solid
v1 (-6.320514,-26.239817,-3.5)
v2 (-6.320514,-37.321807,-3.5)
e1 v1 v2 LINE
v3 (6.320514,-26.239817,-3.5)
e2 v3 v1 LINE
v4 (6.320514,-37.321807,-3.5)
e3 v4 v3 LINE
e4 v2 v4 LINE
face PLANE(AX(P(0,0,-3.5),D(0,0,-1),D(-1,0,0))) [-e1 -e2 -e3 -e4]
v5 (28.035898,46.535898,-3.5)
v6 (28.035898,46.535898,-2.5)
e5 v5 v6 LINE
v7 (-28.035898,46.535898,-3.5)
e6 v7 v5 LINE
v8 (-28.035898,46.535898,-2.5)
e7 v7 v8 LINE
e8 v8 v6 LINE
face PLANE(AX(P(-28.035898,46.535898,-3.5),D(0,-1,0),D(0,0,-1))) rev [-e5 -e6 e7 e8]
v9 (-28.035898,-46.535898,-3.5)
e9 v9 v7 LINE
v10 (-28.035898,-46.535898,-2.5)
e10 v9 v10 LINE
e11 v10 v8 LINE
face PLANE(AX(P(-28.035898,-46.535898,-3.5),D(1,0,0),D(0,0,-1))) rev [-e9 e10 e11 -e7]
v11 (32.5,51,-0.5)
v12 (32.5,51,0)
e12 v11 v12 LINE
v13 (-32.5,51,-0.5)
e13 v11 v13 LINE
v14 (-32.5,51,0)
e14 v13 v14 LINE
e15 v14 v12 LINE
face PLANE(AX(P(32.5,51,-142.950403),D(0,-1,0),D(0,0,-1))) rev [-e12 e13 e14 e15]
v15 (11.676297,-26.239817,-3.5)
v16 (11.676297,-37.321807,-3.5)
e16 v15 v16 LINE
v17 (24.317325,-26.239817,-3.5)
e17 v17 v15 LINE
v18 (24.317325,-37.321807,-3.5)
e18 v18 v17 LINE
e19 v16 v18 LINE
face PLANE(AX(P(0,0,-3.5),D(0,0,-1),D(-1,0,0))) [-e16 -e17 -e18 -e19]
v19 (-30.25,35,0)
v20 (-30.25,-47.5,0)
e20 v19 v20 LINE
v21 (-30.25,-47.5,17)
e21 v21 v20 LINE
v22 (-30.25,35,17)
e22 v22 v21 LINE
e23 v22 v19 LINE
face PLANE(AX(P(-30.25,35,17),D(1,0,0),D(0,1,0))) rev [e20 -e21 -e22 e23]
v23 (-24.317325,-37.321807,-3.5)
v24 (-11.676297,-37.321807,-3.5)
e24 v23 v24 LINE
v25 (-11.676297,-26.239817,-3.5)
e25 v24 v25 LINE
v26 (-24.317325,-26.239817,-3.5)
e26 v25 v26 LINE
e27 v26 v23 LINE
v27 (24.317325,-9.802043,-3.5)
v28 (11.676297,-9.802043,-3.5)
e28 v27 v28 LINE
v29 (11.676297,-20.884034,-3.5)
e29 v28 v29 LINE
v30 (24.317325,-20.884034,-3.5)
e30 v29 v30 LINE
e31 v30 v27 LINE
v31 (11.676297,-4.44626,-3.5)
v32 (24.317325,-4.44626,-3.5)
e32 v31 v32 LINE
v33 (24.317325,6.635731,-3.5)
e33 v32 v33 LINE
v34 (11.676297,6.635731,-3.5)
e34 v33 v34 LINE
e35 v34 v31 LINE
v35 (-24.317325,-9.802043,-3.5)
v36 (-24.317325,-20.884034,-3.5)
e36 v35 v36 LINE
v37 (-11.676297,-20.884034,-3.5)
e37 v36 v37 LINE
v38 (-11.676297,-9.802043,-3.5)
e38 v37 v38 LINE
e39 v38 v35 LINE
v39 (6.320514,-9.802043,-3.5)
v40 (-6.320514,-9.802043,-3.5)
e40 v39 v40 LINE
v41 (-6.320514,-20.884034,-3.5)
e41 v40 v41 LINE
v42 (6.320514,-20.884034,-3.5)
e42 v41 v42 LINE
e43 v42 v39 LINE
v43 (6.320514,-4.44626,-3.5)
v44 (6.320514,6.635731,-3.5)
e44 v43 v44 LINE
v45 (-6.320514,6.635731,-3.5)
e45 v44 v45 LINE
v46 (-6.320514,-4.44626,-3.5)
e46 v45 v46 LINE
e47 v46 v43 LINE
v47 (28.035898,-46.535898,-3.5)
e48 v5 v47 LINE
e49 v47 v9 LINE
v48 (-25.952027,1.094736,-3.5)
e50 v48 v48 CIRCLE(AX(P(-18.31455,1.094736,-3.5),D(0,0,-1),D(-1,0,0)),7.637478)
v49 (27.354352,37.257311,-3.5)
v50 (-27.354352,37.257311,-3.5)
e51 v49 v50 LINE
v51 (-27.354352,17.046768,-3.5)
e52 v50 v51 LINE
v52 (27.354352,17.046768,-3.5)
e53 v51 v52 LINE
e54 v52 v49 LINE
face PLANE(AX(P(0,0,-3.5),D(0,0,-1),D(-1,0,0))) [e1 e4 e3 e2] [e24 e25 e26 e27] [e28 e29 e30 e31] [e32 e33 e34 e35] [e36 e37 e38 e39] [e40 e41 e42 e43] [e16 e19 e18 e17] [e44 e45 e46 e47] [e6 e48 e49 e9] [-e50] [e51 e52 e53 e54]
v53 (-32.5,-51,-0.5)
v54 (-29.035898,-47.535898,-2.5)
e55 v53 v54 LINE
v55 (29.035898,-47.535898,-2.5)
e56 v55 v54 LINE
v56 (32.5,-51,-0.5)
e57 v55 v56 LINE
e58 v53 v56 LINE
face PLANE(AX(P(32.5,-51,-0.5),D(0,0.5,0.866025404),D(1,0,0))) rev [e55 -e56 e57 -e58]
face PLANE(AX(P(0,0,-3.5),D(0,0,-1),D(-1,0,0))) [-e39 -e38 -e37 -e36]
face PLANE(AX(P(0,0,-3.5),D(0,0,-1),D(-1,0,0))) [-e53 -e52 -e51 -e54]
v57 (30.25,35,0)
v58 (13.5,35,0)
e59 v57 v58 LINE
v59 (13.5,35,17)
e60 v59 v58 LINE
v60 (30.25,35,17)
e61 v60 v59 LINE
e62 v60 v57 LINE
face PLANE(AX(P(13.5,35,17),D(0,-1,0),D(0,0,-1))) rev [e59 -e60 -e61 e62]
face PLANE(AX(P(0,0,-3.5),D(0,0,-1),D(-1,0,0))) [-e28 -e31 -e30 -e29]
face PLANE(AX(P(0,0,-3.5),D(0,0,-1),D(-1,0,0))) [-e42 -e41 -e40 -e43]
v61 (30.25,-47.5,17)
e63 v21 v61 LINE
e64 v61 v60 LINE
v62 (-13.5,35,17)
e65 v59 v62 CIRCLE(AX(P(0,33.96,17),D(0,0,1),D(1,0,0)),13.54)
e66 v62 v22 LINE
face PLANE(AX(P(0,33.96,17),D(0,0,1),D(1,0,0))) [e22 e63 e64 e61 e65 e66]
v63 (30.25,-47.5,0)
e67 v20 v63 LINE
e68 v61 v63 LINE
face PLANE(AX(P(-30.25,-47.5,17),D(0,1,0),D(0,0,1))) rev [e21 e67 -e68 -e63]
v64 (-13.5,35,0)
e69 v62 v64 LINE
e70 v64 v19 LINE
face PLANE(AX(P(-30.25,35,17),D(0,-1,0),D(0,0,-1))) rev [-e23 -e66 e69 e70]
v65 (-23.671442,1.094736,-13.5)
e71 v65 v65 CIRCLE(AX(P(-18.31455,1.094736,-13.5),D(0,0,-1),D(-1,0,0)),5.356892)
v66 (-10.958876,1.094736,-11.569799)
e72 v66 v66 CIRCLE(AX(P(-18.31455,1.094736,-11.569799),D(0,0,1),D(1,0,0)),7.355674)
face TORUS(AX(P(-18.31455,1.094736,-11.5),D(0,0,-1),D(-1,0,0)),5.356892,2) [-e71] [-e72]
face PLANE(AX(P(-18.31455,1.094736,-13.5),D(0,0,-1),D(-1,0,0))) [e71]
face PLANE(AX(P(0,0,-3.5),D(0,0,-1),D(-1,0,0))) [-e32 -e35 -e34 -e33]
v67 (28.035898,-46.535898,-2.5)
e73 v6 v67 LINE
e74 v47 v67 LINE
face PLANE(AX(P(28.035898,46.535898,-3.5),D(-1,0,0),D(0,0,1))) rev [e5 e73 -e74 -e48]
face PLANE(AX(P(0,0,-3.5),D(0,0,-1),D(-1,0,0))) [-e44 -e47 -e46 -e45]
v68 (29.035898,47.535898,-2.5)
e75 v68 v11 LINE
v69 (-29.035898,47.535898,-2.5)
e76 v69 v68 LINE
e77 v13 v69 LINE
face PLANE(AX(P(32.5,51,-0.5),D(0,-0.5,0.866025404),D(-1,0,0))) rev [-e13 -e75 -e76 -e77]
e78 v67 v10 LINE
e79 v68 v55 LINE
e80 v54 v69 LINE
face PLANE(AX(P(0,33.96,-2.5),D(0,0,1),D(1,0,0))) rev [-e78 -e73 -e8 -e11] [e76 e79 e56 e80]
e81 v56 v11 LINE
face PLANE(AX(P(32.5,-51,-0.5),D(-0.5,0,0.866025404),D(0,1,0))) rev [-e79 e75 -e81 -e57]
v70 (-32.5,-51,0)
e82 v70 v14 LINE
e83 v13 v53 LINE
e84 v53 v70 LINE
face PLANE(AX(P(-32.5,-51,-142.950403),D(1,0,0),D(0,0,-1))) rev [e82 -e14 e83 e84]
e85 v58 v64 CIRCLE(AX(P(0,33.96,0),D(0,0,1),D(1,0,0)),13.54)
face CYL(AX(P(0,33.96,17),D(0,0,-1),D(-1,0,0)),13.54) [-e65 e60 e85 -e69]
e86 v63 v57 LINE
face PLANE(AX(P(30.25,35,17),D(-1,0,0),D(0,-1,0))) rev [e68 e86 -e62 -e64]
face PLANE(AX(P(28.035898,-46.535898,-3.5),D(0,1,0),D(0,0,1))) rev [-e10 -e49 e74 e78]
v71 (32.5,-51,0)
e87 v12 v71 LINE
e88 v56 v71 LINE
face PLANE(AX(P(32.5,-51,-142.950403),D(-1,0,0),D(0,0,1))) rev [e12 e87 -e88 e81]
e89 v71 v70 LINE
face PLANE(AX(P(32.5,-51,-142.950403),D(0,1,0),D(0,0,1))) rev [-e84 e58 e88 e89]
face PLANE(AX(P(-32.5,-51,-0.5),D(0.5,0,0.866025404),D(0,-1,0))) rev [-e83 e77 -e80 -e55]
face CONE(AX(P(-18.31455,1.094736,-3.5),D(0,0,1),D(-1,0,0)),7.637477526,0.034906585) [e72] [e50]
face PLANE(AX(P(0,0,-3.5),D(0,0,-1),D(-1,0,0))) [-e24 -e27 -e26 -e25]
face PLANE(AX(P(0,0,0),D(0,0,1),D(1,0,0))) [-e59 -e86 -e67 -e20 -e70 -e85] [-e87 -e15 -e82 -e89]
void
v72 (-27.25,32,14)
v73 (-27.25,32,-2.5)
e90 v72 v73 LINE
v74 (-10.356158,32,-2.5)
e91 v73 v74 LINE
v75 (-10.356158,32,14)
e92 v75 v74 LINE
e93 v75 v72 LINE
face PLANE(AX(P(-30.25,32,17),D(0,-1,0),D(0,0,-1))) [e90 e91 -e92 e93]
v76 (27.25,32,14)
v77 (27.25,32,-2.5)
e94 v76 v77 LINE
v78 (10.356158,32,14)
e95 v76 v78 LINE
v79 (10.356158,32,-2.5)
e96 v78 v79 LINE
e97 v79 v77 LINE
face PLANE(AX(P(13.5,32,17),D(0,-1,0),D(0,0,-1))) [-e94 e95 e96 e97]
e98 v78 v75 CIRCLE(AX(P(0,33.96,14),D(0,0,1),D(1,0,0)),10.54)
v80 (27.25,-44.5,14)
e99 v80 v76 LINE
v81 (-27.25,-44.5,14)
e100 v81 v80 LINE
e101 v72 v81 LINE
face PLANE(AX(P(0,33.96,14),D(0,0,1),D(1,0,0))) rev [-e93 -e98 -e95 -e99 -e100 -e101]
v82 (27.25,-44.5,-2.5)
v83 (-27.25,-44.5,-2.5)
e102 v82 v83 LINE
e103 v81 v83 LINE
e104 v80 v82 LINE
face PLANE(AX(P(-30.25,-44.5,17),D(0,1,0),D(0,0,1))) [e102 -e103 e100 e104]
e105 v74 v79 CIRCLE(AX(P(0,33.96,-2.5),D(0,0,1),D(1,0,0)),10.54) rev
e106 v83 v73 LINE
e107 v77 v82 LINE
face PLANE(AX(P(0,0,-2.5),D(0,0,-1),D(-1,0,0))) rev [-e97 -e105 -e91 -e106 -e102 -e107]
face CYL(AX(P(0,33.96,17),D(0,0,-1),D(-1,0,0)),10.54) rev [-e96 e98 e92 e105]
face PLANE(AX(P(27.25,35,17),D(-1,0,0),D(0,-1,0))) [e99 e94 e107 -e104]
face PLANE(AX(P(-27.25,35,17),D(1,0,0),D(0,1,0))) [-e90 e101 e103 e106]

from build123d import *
from OCP.BRepFilletAPI import BRepFilletAPI_MakeChamfer

# Parameters (mm, degrees)
BOSS_EXTRUDE1_DEPTH = 17
SKETCH2_W           = 65
SKETCH2_H           = 102
BOSS_EXTRUDE2_DEPTH = 2.5
SHELL1_START        = -2.5
SHELL1_DEPTH        = 16.5
CHAMFER1_SIZE       = 2
CHAMFER1_SIZE2      = 3.464101615
SKETCH3_W           = 56.07179677
SKETCH3_H           = 93.07179677
BOSS_EXTRUDE3_DEPTH = 1
SKETCH5_R           = 7.637477526
BOSS_EXTRUDE4_DEPTH = 10
BOSS_EXTRUDE4_TAPER = 2
FILLET1_R           = 2


# Read off the part's stored shape, not the designer's step: Shell1
with BuildPart() as part:
    # Sketch1 → Boss-Extrude1 (new body)
    with BuildSketch(Plane.XY):
        with BuildLine():
            Line((13.5, 35), (30.25, 35))
            Line((30.25, 35), (30.25, -47.5))
            Line((30.25, -47.5), (-30.25, -47.5))
            Line((-30.25, -47.5), (-30.25, 35))
            Line((-30.25, 35), (-13.5, 35))
            ThreePointArc((-13.5, 35), (0, 47.5), (13.5, 35))
        make_face()
    extrude(amount=BOSS_EXTRUDE1_DEPTH)

    # Sketch2 → Boss-Extrude2 (add)
    with BuildSketch(Plane(origin=(0, 0, 0), x_dir=(-1, 0, 0), z_dir=(0, 0, -1))):
        Rectangle(SKETCH2_W, SKETCH2_H)
    extrude(amount=BOSS_EXTRUDE2_DEPTH)

    # Shell1 outline → Shell1 (cut)
    with BuildSketch(Plane.XY.offset(SHELL1_START)):
        with BuildLine():
            Line((27.25, -44.5), (27.25, 32))
            Line((27.25, 32), (10.356157589, 32))
            ThreePointArc((10.356157589, 32), (0, 44.5), (-10.356157589, 32))
            Line((-10.356157589, 32), (-27.25, 32))
            Line((-27.25, 32), (-27.25, -44.5))
            Line((-27.25, -44.5), (27.25, -44.5))
        make_face()
    extrude(amount=SHELL1_DEPTH, mode=Mode.SUBTRACT)

    # Chamfer1: one chamfer whose edges measure the first distance from different faces: ONE call of the kernel's chamfer builder (chamfer() names one face for all edges)
    chamfer1_edges_1 = [part.edges().sort_by_distance(p)[0] for p in [
        (0, -51, -2.5),
    ]]
    chamfer1_side_1 = [part.faces().sort_by_distance(p)[0] for p in [
        (0, -51, -1.25),
    ]]
    chamfer1_edges_2 = [part.edges().sort_by_distance(p)[0] for p in [
        (32.5, 0, -2.5),
    ]]
    chamfer1_side_2 = [part.faces().sort_by_distance(p)[0] for p in [
        (32.5, 0, -1.25),
    ]]
    chamfer1_edges_3 = [part.edges().sort_by_distance(p)[0] for p in [
        (0, 51, -2.5),
    ]]
    chamfer1_side_3 = [part.faces().sort_by_distance(p)[0] for p in [
        (0, 51, -1.25),
    ]]
    chamfer1_edges_4 = [part.edges().sort_by_distance(p)[0] for p in [
        (-32.5, 0, -2.5),
    ]]
    chamfer1_side_4 = [part.faces().sort_by_distance(p)[0] for p in [
        (-32.5, 0, -1.25),
    ]]
    chamfer1 = BRepFilletAPI_MakeChamfer(part.part.solid().wrapped)
    for e in chamfer1_edges_1:
        chamfer1.Add(CHAMFER1_SIZE, CHAMFER1_SIZE2, e.wrapped, chamfer1_side_1[0].wrapped)  # the first distance lies on this face
    for e in chamfer1_edges_2:
        chamfer1.Add(CHAMFER1_SIZE, CHAMFER1_SIZE2, e.wrapped, chamfer1_side_2[0].wrapped)  # the first distance lies on this face
    for e in chamfer1_edges_3:
        chamfer1.Add(CHAMFER1_SIZE, CHAMFER1_SIZE2, e.wrapped, chamfer1_side_3[0].wrapped)  # the first distance lies on this face
    for e in chamfer1_edges_4:
        chamfer1.Add(CHAMFER1_SIZE, CHAMFER1_SIZE2, e.wrapped, chamfer1_side_4[0].wrapped)  # the first distance lies on this face
    add(Compound.cast(chamfer1.Shape()), mode=Mode.REPLACE)

    # Sketch3 → Boss-Extrude3 (add)
    with BuildSketch(Plane(origin=(0, 0, -2.5), x_dir=(-1, 0, 0), z_dir=(0, 0, -1))):
        Rectangle(SKETCH3_W, SKETCH3_H)
    extrude(amount=BOSS_EXTRUDE3_DEPTH)

    # Sketch5 → Boss-Extrude4 (add)
    with BuildSketch(Plane(origin=(0, 0, -3.5), x_dir=(-1, 0, 0), z_dir=(0, 0, -1))):
        with Locations((18.314549778, 1.094735509)):
            Circle(SKETCH5_R)
    extrude(amount=BOSS_EXTRUDE4_DEPTH, taper=BOSS_EXTRUDE4_TAPER)

    # Fillet1
    fillet1_edges = [part.edges().sort_by_distance(p)[0] for p in [
        (-11.026279948, 1.094735509, -13.5),
    ]]
    fillet(fillet1_edges, radius=FILLET1_R)


solid = part.part
